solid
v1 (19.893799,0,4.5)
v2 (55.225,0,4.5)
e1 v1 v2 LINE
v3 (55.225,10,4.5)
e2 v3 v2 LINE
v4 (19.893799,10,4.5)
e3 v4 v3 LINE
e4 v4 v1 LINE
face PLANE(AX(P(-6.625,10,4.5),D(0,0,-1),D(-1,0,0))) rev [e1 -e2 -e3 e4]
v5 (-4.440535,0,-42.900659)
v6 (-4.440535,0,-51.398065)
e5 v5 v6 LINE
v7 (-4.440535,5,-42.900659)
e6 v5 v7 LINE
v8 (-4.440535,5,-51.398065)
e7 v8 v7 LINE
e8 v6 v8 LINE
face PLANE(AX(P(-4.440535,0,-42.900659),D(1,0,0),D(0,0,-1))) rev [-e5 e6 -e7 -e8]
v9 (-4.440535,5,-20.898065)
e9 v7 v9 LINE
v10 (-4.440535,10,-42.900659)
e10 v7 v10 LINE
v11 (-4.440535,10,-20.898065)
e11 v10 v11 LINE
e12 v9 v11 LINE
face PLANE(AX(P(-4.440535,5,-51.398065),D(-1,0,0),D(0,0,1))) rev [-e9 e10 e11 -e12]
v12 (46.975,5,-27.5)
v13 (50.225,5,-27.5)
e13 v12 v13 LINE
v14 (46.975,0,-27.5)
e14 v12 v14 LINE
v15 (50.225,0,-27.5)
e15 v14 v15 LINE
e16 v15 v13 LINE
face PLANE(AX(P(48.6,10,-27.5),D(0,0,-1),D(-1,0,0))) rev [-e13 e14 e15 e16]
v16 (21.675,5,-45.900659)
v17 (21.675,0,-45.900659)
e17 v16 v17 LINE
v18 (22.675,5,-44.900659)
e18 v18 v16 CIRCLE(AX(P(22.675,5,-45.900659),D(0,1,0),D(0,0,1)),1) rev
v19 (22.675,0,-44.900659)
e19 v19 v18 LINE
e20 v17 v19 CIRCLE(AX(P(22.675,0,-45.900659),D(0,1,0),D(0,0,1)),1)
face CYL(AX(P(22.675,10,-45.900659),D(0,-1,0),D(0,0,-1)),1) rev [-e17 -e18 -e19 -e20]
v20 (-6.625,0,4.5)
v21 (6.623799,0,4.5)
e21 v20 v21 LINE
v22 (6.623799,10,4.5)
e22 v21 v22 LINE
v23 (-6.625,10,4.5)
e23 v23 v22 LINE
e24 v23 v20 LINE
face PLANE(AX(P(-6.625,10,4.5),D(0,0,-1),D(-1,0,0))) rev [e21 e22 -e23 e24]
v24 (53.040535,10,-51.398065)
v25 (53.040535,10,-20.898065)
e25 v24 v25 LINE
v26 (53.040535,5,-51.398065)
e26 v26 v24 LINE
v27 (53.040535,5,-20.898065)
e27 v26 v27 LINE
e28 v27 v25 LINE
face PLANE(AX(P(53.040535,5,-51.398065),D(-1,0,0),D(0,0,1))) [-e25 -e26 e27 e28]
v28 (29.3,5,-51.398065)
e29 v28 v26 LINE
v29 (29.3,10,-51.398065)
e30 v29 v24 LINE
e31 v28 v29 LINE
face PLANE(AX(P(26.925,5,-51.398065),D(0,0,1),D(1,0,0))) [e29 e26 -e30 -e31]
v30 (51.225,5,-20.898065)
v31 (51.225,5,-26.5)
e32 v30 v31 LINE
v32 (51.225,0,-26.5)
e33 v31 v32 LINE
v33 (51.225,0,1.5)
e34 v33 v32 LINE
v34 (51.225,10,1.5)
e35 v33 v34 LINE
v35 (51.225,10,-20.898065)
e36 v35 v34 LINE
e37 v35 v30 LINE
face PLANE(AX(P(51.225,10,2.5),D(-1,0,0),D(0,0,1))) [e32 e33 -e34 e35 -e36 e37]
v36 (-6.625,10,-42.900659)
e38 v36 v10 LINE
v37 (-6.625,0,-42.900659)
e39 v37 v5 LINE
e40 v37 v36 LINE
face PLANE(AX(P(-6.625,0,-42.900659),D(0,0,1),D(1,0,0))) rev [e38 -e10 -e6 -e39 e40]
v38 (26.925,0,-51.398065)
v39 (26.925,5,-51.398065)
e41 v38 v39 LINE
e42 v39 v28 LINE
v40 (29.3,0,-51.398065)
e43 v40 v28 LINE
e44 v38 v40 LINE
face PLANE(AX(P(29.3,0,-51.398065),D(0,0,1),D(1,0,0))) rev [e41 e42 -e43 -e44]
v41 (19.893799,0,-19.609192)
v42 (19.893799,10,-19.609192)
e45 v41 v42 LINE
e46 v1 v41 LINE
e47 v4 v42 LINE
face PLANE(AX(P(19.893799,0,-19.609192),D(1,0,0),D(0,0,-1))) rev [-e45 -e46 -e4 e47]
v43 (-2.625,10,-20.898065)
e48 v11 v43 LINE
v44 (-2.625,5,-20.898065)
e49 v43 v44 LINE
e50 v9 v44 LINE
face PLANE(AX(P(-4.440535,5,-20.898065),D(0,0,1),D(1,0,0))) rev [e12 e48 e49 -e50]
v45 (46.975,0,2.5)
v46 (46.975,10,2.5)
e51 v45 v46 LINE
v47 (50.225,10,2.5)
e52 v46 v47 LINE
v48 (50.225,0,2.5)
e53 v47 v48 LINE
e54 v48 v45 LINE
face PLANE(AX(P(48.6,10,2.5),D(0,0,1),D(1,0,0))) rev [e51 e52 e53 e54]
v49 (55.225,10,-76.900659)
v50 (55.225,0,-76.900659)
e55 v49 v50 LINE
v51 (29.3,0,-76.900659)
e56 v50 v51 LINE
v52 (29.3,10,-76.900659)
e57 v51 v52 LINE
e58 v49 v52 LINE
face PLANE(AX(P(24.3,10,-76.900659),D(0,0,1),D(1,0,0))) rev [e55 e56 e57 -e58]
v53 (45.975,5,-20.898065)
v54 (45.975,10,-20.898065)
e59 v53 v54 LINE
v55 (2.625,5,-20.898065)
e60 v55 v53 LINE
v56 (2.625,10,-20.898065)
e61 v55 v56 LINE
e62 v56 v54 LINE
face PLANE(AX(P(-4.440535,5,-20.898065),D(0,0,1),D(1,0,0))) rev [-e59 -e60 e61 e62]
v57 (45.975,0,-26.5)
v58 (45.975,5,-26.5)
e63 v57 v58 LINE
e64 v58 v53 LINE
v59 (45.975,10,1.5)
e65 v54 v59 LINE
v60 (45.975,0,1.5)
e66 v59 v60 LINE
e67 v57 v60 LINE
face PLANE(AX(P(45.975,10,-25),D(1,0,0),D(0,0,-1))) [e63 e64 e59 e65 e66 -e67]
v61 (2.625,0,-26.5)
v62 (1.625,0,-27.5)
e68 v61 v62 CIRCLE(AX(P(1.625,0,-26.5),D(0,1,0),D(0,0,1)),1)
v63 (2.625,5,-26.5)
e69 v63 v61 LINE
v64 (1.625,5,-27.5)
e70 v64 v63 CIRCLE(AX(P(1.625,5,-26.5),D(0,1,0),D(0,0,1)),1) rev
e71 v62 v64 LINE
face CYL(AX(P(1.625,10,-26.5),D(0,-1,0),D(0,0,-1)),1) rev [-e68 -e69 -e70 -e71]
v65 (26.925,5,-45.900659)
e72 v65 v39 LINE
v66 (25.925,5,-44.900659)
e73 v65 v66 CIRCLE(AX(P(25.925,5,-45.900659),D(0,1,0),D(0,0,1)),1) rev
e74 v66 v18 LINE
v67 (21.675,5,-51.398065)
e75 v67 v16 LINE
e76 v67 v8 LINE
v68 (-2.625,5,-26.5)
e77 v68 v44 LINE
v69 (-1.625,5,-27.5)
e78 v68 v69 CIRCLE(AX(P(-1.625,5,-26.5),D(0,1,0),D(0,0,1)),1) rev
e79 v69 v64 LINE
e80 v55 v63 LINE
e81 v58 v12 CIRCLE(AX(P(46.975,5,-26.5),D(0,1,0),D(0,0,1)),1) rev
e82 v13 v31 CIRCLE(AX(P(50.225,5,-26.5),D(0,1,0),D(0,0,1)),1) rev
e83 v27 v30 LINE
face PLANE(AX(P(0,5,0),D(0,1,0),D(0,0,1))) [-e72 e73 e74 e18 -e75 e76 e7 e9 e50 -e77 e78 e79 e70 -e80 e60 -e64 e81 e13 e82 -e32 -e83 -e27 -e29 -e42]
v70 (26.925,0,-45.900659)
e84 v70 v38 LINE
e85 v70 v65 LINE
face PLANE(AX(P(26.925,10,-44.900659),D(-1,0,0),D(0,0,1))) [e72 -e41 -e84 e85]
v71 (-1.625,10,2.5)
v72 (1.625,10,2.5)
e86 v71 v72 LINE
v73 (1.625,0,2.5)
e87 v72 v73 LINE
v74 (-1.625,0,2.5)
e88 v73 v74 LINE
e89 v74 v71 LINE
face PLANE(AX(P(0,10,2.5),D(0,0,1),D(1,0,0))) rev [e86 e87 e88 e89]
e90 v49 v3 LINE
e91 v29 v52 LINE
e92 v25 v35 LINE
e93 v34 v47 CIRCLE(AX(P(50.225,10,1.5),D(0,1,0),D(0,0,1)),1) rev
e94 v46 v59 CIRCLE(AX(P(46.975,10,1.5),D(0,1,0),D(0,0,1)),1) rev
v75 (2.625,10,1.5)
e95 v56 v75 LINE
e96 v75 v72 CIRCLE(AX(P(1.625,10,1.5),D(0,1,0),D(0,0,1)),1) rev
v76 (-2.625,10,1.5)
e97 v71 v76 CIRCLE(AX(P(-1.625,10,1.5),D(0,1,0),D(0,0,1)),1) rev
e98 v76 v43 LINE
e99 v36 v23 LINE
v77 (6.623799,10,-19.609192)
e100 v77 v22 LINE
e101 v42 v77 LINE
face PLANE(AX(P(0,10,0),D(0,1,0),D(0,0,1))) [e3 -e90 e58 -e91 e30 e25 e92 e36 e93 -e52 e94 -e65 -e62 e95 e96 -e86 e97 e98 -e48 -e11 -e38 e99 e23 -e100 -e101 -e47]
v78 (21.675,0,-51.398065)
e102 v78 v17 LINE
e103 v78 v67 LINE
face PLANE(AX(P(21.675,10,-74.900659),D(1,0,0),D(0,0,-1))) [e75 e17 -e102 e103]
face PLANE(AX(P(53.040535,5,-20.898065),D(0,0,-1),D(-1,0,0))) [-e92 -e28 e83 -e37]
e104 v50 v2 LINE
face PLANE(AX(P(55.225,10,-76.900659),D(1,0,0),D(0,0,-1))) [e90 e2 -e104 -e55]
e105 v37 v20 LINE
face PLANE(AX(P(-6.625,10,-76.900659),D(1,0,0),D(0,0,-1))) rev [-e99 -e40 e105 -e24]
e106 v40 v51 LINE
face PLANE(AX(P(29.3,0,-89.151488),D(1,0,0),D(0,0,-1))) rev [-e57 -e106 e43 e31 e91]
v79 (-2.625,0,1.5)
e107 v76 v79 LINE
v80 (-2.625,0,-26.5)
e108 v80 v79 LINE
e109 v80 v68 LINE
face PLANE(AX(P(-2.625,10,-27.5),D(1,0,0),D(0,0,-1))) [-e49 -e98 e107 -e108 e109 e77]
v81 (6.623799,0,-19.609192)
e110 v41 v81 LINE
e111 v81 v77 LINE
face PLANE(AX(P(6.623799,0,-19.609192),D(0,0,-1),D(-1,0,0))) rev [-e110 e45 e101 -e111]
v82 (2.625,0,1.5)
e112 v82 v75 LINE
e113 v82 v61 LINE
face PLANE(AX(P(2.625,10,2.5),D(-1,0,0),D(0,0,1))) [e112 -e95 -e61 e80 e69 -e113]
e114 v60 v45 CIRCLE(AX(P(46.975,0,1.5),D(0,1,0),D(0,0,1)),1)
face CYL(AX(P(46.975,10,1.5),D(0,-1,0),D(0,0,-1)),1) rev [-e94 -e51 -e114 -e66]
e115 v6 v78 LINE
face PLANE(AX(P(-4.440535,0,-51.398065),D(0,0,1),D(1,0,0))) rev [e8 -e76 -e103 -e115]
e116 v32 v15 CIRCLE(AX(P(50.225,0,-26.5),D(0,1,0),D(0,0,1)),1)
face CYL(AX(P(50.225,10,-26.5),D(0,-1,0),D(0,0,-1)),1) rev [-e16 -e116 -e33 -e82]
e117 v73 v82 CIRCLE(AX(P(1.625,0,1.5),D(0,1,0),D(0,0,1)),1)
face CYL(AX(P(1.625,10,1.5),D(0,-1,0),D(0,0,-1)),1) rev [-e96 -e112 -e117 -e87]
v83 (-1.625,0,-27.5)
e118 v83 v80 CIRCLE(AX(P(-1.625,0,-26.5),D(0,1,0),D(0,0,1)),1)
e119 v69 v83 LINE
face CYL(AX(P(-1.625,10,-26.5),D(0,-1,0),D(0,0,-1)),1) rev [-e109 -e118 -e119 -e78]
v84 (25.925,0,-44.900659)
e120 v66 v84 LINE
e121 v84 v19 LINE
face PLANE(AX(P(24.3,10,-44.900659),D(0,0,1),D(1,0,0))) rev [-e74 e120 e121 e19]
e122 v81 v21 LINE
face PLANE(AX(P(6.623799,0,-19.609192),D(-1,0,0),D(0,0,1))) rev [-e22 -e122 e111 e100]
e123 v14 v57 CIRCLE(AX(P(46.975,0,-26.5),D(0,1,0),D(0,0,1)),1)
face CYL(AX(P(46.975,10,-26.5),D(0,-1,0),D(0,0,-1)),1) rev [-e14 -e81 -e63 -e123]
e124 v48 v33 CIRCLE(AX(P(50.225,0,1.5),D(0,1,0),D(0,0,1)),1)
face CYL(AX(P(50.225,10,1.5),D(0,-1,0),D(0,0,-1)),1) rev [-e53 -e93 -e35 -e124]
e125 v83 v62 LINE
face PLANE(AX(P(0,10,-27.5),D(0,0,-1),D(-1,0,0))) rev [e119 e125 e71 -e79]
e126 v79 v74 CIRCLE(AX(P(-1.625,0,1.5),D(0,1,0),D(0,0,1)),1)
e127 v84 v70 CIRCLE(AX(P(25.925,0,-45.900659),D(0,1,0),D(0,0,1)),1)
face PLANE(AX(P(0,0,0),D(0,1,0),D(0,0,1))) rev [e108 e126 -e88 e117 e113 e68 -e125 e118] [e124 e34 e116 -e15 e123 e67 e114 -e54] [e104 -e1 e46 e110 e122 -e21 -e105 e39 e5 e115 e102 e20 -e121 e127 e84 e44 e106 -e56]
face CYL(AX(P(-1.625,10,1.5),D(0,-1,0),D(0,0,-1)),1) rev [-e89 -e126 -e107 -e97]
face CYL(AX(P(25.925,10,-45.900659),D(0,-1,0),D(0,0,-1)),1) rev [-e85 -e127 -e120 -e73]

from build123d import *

# Parameters (mm, degrees)
BOSS_EXTRUDE5_DEPTH = 10
CUT_EXTRUDE6_DEPTH  = 5
FILLET4_R           = 1
MIRROR25_DEPTH      = 10
MIRROR25_2_DEPTH    = 5
SKETCH20_W          = 13.27
SKETCH20_H          = 33.288518674
CUT_EXTRUDE7_DEPTH  = 10


# Read off the part's stored shape, not the designer's step: Mirror25
with BuildPart() as part:
    # Sketch15 → Boss-Extrude5 (new body)
    with BuildSketch(Plane(origin=(0, 0, 0), x_dir=(1, 0, 0), z_dir=(0, 1, 0))):
        Polygon((24.3, 76.900659127), (-6.625, 76.900659127), (-6.625, -4.5), (24.3, -4.5), (24.3, 44.900659127), (21.675, 44.900659127), (21.675, 47.400659127), (21.675, 72.400659127), (21.675, 74.900659127), (24.3, 74.900659127), align=None)
        Polygon((-2.625, 25), (-2.625, 0), (-2.625, -2.5), (0, -2.5), (2.625, -2.5), (2.625, 0), (2.625, 25), (2.625, 27.5), (0, 27.5), (-2.625, 27.5), align=None, mode=Mode.SUBTRACT)
    extrude(amount=BOSS_EXTRUDE5_DEPTH)

    # Sketch18 → Cut-Extrude6 (cut)
    with BuildSketch(Plane(origin=(0, 10, 0), x_dir=(1, 0, 0), z_dir=(0, 1, 0))):
        Polygon((21.675, 51.3980649), (-4.44053483, 51.3980649), (-4.44053483, 20.8980649), (24.3, 20.8980649), (24.3, 51.3980649), align=None)
    extrude(amount=-CUT_EXTRUDE6_DEPTH, mode=Mode.SUBTRACT)

    # Fillet4
    fillet4_edges = [part.edges().sort_by_distance(p)[0] for p in [
        (21.675, 5, -74.900659127),
        (-2.625, 5, 2.5),
        (2.625, 5, 2.5),
        (2.625, 2.5, -27.5),
        (-2.625, 2.5, -27.5),
        (21.675, 2.5, -44.900659127),
    ]]
    fillet(fillet4_edges, radius=FILLET4_R)

    # Mirror25 outline → Mirror25 (add)
    with BuildSketch(Plane(origin=(0, 0, 0), x_dir=(1, 0, 0), z_dir=(0, 1, 0))):
        with BuildLine():
            Line((45.975, 20.8980649), (24.3, 20.8980649))
            Line((24.3, 20.8980649), (24.3, -4.5))
            Line((24.3, -4.5), (55.225, -4.5))
            Line((55.225, -4.5), (55.225, 76.900659127))
            Line((55.225, 76.900659127), (24.3, 76.900659127))
            Line((24.3, 76.900659127), (24.3, 74.900659127))
            Line((24.3, 74.900659127), (25.925, 74.900659127))
            ThreePointArc((25.925, 74.900659127), (26.632106781, 74.607765908), (26.925, 73.900659127))
            Line((26.925, 73.900659127), (26.925, 51.3980649))
            Line((26.925, 51.3980649), (53.04053483, 51.3980649))
            Line((53.04053483, 51.3980649), (53.04053483, 20.8980649))
            Line((53.04053483, 20.8980649), (51.225, 20.8980649))
            Line((51.225, 20.8980649), (51.225, -1.5))
            ThreePointArc((51.225, -1.5), (50.932106781, -2.207106781), (50.225, -2.5))
            Line((50.225, -2.5), (46.975, -2.5))
            ThreePointArc((46.975, -2.5), (46.267893219, -2.207106781), (45.975, -1.5))
            Line((45.975, -1.5), (45.975, 20.8980649))
        make_face()
    extrude(amount=MIRROR25_DEPTH)

    # Mirror25 2 outline → Mirror25 2 (add)
    with BuildSketch(Plane(origin=(0, 0, 0), x_dir=(1, 0, 0), z_dir=(0, 1, 0))):
        with BuildLine():
            Line((25.925, 44.900659127), (24.3, 44.900659127))
            Line((24.3, 44.900659127), (24.3, 20.8980649))
            Line((24.3, 20.8980649), (45.975, 20.8980649))
            Line((45.975, 20.8980649), (45.975, 26.5))
            ThreePointArc((45.975, 26.5), (46.267893219, 27.207106781), (46.975, 27.5))
            Line((46.975, 27.5), (50.225, 27.5))
            ThreePointArc((50.225, 27.5), (50.932106781, 27.207106781), (51.225, 26.5))
            Line((51.225, 26.5), (51.225, 20.8980649))
            Line((51.225, 20.8980649), (53.04053483, 20.8980649))
            Line((53.04053483, 20.8980649), (53.04053483, 51.3980649))
            Line((53.04053483, 51.3980649), (26.925, 51.3980649))
            Line((26.925, 51.3980649), (26.925, 45.900659127))
            ThreePointArc((26.925, 45.900659127), (26.632106781, 45.193552346), (25.925, 44.900659127))
        make_face()
    extrude(amount=MIRROR25_2_DEPTH)

    # Sketch20 → Cut-Extrude7 (cut)
    with BuildSketch(Plane(origin=(0, 10, 0), x_dir=(1, 0, 0), z_dir=(0, 1, 0))):
        with Locations((13.258799085, 2.964933045)):
            Rectangle(SKETCH20_W, SKETCH20_H)
        Polygon((-6.625, 76.900659127), (14.49053483, 76.900659127), (14.49053483, 89.151488298), (21.675, 89.151488298), (26.925, 89.151488298), (29.3, 89.151488298), (29.3, 51.3980649), (26.925, 51.3980649), (26.925, 61.088659891), (21.675, 61.088659891), (21.675, 51.3980649), (-4.44053483, 51.3980649), (-4.44053483, 42.900659127), (-6.625, 42.900659127), (-6.625, 56.002594228), align=None)
    extrude(amount=-CUT_EXTRUDE7_DEPTH, mode=Mode.SUBTRACT)


solid = part.part
